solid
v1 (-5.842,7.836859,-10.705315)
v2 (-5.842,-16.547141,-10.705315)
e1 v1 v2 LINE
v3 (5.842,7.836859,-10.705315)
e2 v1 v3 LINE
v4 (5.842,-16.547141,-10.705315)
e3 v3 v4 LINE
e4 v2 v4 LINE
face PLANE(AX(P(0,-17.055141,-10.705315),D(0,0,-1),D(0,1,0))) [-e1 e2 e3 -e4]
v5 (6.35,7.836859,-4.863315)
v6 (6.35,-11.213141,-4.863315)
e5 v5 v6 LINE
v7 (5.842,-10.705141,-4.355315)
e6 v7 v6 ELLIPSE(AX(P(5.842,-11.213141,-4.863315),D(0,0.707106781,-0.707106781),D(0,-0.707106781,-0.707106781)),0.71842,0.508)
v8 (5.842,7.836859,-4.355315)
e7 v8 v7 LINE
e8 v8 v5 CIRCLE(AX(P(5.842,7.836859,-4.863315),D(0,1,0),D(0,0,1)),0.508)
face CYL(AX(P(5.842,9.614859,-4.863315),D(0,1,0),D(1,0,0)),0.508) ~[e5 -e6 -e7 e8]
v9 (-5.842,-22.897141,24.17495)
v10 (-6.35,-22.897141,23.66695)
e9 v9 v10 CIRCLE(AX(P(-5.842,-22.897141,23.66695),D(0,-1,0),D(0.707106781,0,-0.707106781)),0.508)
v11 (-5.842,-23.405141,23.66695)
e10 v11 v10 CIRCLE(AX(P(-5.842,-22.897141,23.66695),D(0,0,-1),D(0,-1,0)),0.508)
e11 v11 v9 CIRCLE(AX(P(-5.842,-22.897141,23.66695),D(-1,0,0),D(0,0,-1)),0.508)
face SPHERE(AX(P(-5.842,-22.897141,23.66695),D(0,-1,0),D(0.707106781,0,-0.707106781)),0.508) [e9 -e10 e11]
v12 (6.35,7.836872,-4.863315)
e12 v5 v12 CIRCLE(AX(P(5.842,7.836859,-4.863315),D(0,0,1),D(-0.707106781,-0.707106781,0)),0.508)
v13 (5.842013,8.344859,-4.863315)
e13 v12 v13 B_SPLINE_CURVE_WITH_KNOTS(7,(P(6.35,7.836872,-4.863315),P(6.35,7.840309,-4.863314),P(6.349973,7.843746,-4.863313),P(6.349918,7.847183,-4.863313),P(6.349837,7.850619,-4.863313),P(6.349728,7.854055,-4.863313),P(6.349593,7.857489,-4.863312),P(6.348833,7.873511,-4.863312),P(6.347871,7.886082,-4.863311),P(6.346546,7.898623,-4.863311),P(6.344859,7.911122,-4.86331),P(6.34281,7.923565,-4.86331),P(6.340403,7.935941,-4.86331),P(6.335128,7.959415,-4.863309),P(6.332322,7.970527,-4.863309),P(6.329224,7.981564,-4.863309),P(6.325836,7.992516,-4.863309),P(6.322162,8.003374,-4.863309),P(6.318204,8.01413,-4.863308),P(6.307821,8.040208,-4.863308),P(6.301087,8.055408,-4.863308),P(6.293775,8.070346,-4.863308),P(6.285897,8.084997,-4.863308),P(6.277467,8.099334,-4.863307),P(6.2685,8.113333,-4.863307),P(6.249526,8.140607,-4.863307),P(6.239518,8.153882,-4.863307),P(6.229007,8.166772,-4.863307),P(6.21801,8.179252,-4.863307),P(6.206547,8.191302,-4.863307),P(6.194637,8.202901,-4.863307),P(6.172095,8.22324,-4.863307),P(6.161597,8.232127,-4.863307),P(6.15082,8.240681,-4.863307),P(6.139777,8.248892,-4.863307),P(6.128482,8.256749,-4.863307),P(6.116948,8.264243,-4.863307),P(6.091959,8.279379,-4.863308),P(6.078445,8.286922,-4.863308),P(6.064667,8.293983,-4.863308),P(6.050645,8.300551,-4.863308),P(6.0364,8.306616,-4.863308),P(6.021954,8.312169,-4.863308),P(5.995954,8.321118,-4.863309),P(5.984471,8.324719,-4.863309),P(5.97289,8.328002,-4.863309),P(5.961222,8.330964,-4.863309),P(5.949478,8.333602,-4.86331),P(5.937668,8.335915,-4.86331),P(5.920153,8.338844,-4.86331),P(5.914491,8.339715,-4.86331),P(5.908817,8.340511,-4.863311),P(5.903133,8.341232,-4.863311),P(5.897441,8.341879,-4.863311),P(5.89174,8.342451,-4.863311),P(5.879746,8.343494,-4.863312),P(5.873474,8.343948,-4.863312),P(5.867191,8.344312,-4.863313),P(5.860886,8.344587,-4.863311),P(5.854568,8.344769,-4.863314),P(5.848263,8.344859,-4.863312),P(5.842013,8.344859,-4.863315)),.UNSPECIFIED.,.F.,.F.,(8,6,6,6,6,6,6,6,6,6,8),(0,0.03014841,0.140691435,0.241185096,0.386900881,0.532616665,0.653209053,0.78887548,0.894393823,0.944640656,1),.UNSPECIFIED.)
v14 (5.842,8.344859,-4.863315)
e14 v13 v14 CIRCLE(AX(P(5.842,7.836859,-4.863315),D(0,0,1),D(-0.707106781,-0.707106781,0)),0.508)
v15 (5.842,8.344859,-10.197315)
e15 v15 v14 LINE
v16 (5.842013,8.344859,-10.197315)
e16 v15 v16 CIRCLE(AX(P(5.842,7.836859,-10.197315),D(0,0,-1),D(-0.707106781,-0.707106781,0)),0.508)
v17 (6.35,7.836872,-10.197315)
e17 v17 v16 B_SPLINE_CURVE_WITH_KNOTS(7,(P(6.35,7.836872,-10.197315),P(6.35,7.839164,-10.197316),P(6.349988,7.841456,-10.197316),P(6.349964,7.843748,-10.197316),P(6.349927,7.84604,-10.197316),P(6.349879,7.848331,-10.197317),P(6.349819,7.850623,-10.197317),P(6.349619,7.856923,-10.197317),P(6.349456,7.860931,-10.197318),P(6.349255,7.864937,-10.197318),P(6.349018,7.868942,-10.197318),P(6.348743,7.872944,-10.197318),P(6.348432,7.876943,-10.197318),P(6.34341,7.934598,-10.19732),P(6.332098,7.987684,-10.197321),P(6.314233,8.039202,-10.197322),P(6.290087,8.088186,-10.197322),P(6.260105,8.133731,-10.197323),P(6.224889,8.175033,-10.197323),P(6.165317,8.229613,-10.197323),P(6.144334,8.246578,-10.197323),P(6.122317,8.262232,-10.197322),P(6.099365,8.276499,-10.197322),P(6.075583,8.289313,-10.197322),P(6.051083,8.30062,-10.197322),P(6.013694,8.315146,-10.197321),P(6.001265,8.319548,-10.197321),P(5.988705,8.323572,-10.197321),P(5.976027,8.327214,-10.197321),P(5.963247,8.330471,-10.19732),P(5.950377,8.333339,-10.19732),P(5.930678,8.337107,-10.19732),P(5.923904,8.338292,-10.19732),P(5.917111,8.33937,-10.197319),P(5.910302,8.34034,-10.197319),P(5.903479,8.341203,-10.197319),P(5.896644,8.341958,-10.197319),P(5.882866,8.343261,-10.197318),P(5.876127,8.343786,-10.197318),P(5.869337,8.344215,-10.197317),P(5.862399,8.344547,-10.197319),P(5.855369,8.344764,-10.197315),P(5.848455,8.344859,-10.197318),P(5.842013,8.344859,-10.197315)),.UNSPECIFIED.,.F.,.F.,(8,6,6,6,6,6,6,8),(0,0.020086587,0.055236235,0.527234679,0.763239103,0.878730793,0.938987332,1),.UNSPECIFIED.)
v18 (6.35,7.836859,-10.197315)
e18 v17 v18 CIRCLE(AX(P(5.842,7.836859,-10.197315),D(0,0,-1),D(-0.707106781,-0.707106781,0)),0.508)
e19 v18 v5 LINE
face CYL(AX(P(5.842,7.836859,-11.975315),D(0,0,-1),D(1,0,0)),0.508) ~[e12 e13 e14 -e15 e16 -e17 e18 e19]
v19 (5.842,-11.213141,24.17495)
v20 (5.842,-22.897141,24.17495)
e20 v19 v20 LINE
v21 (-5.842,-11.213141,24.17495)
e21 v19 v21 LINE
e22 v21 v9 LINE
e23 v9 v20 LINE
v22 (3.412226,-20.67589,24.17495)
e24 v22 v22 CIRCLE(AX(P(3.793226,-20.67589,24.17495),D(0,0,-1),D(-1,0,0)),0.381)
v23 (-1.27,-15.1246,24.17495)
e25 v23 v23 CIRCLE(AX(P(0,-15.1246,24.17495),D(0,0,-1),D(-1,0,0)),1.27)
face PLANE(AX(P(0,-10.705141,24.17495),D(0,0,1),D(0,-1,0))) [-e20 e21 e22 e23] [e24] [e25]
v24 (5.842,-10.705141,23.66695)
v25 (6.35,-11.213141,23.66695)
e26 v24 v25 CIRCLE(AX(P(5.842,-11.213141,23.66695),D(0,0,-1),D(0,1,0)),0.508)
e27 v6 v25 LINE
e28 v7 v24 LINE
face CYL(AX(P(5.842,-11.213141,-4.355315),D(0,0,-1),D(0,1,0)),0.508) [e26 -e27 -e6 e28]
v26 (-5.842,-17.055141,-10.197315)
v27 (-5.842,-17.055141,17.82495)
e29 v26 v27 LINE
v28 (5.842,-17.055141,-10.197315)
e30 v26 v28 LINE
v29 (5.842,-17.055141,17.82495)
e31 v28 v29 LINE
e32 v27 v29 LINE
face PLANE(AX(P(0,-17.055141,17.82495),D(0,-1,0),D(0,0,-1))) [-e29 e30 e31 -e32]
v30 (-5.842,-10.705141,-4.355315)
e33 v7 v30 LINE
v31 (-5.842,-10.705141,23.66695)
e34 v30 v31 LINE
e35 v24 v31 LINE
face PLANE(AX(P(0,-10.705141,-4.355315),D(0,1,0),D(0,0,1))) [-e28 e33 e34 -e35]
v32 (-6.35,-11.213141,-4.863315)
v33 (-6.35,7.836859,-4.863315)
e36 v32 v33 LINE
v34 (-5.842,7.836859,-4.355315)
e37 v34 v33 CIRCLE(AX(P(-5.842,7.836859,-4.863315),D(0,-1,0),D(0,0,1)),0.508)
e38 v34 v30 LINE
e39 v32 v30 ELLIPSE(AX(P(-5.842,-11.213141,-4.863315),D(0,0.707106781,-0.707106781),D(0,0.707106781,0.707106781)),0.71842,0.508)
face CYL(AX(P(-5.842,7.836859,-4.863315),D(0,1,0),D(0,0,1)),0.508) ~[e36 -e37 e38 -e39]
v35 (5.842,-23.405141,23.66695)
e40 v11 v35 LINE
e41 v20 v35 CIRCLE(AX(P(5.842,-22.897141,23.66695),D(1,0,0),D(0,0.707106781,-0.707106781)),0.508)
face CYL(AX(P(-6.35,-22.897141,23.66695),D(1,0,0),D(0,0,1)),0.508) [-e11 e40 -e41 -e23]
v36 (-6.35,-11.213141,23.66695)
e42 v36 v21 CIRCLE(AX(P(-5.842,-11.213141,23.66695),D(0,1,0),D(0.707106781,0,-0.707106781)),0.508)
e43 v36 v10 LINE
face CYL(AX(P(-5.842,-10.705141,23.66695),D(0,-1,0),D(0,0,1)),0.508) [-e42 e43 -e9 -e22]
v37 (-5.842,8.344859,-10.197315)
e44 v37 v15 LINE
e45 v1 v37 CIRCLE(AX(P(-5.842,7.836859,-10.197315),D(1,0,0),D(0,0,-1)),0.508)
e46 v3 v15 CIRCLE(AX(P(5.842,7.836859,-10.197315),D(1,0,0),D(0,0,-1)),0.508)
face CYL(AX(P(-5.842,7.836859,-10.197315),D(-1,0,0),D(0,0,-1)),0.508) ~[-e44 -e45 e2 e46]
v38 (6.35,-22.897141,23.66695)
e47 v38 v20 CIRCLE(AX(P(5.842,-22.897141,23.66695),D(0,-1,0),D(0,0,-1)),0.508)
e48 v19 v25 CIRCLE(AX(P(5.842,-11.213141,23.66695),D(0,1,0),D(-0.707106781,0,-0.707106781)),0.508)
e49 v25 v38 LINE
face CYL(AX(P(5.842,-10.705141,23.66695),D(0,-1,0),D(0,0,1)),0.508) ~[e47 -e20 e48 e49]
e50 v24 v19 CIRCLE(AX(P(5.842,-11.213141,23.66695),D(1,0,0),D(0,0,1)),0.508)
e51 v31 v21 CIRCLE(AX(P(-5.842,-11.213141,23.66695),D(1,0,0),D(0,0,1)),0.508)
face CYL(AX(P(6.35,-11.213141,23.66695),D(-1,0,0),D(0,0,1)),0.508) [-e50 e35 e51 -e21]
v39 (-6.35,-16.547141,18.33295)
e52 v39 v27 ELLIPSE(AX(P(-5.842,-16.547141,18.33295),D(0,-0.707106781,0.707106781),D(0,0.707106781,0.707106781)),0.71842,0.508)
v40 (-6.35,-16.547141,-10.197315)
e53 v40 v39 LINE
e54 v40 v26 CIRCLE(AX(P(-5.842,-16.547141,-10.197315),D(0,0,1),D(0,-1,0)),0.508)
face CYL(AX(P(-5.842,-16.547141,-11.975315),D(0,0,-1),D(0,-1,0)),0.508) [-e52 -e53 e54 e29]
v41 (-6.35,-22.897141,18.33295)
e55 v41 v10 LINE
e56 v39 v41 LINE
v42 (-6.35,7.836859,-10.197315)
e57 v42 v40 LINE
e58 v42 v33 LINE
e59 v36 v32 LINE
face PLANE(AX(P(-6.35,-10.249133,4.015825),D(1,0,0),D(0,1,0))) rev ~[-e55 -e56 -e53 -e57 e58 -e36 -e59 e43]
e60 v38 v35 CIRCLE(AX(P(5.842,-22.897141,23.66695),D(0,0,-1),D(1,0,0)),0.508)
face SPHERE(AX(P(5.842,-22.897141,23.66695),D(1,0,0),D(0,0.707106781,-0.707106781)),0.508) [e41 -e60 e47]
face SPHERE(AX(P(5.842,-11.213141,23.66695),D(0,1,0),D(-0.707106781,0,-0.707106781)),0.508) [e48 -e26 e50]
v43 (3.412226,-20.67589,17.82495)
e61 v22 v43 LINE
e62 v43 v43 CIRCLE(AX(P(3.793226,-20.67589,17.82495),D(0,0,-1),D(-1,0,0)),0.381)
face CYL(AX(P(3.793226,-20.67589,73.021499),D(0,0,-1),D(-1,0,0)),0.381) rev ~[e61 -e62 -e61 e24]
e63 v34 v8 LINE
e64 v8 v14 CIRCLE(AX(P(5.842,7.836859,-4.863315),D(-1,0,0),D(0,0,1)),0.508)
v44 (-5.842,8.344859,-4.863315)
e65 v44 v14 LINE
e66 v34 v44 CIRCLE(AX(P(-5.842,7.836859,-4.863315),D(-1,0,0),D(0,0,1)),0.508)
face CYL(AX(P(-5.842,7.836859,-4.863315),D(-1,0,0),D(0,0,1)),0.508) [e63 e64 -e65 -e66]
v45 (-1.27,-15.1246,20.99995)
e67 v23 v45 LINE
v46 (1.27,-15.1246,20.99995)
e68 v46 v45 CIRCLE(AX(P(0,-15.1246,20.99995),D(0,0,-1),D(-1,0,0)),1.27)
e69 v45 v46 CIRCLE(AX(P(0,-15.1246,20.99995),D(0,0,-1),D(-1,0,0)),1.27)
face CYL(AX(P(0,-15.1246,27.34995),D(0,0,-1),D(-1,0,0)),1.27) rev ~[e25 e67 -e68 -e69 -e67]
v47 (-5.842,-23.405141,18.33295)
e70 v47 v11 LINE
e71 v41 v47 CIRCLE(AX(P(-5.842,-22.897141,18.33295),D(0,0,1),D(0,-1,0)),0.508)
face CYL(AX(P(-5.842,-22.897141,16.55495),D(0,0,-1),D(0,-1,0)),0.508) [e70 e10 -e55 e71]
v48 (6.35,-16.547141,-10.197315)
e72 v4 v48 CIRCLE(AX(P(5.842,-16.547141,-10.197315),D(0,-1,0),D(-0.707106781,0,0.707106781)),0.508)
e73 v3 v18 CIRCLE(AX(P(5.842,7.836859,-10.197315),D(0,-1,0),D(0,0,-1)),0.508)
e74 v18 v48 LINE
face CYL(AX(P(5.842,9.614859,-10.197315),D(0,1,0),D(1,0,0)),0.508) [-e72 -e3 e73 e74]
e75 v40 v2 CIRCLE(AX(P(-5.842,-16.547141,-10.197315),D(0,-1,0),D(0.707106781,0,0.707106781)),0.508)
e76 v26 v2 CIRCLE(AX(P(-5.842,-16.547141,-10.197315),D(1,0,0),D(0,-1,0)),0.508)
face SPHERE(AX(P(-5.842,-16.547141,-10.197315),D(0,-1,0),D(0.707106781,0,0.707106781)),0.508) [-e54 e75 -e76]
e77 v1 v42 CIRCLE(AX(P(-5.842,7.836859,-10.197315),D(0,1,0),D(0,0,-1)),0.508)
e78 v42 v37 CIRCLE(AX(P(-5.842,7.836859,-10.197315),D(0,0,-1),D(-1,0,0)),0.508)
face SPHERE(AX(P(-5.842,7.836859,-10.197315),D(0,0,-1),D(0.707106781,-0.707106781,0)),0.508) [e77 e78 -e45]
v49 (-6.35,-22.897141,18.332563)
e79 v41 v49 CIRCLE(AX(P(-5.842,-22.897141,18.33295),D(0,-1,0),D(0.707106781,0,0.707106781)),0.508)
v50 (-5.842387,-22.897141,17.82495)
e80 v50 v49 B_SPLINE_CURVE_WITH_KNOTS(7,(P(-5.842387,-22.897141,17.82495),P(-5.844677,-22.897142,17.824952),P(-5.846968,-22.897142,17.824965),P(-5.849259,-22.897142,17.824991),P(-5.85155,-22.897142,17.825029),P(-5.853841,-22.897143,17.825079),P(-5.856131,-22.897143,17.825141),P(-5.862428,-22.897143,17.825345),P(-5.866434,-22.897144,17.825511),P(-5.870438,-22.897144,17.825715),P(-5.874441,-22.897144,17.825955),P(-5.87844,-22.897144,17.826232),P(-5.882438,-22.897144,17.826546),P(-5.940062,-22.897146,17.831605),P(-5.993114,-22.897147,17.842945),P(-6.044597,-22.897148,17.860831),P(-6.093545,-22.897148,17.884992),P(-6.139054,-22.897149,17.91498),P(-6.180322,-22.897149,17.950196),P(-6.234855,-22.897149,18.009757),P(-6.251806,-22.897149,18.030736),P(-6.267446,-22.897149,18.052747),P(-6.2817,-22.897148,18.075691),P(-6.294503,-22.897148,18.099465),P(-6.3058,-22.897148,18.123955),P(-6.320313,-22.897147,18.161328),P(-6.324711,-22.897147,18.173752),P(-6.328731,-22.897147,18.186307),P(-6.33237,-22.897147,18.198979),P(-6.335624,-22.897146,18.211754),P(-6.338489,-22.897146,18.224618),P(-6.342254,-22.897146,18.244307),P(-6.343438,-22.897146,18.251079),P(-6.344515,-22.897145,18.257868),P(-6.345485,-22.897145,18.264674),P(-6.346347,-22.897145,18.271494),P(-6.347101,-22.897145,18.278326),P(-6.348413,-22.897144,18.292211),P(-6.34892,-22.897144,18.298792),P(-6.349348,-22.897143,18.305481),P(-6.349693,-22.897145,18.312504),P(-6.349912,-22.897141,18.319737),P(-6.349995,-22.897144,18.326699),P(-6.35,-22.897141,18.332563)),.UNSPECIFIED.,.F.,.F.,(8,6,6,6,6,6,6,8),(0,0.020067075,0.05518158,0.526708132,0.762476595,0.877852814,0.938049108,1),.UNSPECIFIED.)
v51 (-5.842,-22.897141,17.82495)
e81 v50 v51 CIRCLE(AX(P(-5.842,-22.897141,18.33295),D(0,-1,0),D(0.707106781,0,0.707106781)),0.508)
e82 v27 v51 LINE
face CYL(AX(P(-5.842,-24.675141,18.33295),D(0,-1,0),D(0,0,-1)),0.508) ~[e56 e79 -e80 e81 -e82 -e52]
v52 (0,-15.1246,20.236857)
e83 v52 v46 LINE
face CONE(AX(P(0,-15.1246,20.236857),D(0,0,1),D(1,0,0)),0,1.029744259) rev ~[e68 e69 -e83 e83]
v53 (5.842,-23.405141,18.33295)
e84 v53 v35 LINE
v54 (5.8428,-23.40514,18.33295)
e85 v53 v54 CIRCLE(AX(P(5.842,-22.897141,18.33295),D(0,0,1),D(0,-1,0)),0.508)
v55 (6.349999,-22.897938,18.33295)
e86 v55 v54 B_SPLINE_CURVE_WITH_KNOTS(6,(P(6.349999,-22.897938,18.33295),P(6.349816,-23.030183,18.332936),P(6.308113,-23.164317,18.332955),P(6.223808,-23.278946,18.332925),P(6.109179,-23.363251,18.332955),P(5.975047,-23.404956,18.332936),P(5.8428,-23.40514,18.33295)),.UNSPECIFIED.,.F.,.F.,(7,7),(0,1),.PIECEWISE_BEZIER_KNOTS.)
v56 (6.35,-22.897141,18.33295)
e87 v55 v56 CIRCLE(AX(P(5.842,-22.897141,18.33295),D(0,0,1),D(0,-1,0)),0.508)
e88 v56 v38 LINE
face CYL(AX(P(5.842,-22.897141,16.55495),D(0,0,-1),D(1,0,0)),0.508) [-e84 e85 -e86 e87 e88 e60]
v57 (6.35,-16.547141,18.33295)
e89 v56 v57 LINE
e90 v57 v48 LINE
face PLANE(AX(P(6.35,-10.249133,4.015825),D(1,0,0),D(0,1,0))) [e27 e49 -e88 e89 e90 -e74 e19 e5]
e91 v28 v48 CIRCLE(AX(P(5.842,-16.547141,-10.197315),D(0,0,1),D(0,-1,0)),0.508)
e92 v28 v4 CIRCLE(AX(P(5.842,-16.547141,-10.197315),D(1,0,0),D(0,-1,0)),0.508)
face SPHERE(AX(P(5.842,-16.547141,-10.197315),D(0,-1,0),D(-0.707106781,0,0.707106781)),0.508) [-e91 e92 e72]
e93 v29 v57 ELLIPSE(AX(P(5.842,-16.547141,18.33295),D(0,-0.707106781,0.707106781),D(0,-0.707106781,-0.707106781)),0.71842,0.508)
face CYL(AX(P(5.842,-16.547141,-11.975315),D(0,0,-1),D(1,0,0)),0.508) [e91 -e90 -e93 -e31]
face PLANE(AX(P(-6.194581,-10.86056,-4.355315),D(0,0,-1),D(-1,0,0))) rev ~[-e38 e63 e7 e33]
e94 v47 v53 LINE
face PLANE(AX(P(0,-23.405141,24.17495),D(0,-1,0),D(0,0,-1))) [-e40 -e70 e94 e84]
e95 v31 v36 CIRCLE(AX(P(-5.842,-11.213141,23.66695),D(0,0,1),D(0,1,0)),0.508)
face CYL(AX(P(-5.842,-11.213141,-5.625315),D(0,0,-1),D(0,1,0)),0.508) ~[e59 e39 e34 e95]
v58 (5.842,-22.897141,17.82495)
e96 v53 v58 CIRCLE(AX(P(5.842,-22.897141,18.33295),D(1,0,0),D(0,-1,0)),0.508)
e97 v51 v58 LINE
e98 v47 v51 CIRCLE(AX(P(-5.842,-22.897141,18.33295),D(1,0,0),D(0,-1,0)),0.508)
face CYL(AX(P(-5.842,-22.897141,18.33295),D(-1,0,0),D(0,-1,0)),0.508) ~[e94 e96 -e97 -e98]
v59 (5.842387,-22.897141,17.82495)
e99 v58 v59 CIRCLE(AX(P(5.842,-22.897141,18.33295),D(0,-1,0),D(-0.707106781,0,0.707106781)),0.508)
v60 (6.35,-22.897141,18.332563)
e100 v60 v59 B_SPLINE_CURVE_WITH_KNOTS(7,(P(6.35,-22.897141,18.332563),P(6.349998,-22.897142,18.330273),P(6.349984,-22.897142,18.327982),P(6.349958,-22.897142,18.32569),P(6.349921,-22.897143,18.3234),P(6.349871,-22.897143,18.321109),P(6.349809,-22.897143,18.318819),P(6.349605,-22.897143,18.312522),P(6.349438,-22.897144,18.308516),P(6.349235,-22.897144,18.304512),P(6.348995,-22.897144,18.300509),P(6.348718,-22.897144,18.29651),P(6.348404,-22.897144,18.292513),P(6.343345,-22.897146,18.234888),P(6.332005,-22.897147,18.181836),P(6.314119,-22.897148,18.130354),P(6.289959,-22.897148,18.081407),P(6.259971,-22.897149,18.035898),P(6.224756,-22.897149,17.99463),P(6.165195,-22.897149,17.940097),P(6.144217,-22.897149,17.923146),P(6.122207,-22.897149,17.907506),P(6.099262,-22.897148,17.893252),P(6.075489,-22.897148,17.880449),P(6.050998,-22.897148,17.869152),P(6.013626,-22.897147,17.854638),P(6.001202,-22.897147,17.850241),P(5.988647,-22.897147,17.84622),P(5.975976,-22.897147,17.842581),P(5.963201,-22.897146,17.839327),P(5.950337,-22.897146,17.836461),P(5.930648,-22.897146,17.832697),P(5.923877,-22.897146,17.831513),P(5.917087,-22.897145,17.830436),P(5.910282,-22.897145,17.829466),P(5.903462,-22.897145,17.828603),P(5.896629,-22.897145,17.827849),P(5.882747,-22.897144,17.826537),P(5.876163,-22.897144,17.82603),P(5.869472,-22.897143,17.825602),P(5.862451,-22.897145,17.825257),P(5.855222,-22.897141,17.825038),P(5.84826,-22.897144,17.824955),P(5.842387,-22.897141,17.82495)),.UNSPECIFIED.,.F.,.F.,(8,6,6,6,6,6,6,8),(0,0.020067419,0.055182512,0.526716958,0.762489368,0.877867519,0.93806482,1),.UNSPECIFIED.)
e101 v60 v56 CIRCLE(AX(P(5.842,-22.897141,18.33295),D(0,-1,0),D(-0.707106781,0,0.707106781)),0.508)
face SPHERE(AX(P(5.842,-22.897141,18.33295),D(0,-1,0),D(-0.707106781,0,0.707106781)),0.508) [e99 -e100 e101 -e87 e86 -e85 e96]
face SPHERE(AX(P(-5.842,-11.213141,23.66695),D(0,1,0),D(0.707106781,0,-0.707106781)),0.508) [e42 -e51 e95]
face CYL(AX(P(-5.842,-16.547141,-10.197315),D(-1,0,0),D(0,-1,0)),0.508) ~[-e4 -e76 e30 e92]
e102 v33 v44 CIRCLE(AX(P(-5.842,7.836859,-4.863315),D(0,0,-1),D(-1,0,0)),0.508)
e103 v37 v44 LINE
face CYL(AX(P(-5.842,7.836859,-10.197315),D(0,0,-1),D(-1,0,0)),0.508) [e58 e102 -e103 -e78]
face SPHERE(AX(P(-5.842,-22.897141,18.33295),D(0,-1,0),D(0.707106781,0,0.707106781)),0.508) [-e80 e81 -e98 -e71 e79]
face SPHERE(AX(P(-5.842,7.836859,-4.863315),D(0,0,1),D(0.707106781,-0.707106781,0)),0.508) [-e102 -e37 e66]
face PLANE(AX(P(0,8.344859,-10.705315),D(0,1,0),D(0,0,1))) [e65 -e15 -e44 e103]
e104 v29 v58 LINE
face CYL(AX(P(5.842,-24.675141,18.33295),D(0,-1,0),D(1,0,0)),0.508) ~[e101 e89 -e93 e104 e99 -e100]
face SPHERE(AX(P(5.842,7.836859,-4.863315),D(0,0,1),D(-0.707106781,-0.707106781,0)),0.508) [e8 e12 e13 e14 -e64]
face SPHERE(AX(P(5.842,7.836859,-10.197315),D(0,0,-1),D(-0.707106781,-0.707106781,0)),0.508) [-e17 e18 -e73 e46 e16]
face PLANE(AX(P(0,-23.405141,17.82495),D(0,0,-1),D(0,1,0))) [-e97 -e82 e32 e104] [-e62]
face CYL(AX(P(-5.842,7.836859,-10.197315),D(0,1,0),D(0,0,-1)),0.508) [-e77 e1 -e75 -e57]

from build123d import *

# Parameters (mm, degrees)
F1_DEPTH      = 6.35
F1_DEPTH_BACK = 6.35
F2_R          = 0.508
F3_T1_DEPTH   = 7.112
F3_T3_DEPTH   = 7.62
F3_T5_DEPTH   = 28.0222646616
F3_T7_DEPTH   = 29.8002646616
F3_T9_DEPTH   = 27.94
F3_T11_DEPTH  = 20.32
F3_T13_DEPTH  = 8.89
F3_S17_W      = 0.508
F3_S17_H      = 0.508
F3_T18_DEPTH  = 0.508
F3_S23_W      = 0.508
F3_S23_H      = 0.508
F3_T24_DEPTH  = 0.508
F3_T31_DEPTH  = 8.89
F3_T35_DEPTH  = 31.0702646616
F3_T42_DEPTH  = 29.2922646616
F3_T46_DEPTH  = 21.59
F4_T1_DEPTH   = 28.0222646616
F4_T3_DEPTH   = 11.684
F4_T5_DEPTH   = 5.334
F4_T7_DEPTH   = 26.162
F4_T9_DEPTH   = 29.8002646616
F4_T11_DEPTH  = 18.542
F4_T13_DEPTH  = 7.62
F4_T15_DEPTH  = 7.112
F4_S19_W      = 0.508
F4_S19_H      = 0.508
F4_T20_DEPTH  = 0.508
F4_S25_W      = 0.508
F4_S25_H      = 0.508
F4_T26_DEPTH  = 0.508
F4_S31_W      = 0.508
F4_S31_H      = 0.508
F4_T32_DEPTH  = 0.508
F4_S37_W      = 0.508
F4_S37_H      = 0.508
F4_T38_DEPTH  = 0.508
F4_S43_W      = 0.508
F4_S43_H      = 0.508
F4_T44_DEPTH  = 0.508
F4_S49_W      = 0.508
F4_S49_H      = 0.508
F4_T50_DEPTH  = 0.508
F4_T57_DEPTH  = 19.812
F4_T61_DEPTH  = 29.2922646616
F4_T68_DEPTH  = 31.0702646616
F4_T72_DEPTH  = 8.89
F5_T1_DEPTH   = 11.684
F5_S5_W       = 0.508
F5_S5_H       = 0.508
F5_T6_DEPTH   = 0.508
F5_S11_W      = 0.508
F5_S11_H      = 0.508
F5_T12_DEPTH  = 0.508
F6_T1_DEPTH   = 11.684
F6_S5_W       = 0.508
F6_S5_H       = 0.508
F6_T6_DEPTH   = 0.508
F6_S11_W      = 0.508
F6_S11_H      = 0.508
F6_T12_DEPTH  = 0.508
F8_D          = 2.54
F8_DEPTH      = 3.175
F8_TIP        = 0.7630929862
F10_D         = 0.762


# Not quite as in the source:
# - a fillet or chamfer that OpenCascade refuses, or shapes differently, is made with other operations: its cross-section is extruded or revolved along the edge and cut away or added


with BuildPart() as f1:
    # F0 (on Right) → F1 (new body, two sides)
    with BuildSketch(Plane.YZ) as f1_sk:
        Polygon((-10.7051408962, 24.1749497761), (-23.4051408962, 24.1749497761), (-23.4051408962, 17.8249497761), (-17.0551408962, 17.8249497761), (-17.0551408962, -10.7053148855), (8.3448591038, -10.7053148855), (8.3448591038, -4.3553148855), (-10.7051408962, -4.3553148855), align=None)
    extrude(amount=F1_DEPTH)
    extrude(f1_sk.sketch, amount=-F1_DEPTH_BACK)

    # F2
    f2_edges = [f1.edges().sort_by_distance(p)[0] for p in [
        (0, -23.405141, 24.17495),
        (6.35, -17.055141, 24.17495),
        (0, -10.705141, 24.17495),
        (-6.35, -17.055141, 24.17495),
    ]]
    fillet(f2_edges, radius=F2_R)

    # F3: fillet of radius 0.508 on 7 edges, made by hand

    # F3_s2 → F3_t1 (cut)
    with BuildSketch(Plane.XY.offset(16.5549497761)):
        with BuildLine():
            ThreePointArc((6.35, -22.8971408962), (6.2012102448, -23.256351141), (5.842, -23.4051408962))
            Line((5.842, -23.4051408962), (6.35, -23.4051408962))
            Line((6.35, -23.4051408962), (6.35, -22.8971408962))
        make_face()
    extrude(amount=F3_T1_DEPTH, mode=Mode.SUBTRACT)

    # F3_s4 → F3_t3 (cut)
    with BuildSketch(Plane.XZ.offset(17.0551408962)):
        with BuildLine():
            ThreePointArc((6.35, 18.3329497761), (6.2012102448, 17.9737395313), (5.842, 17.8249497761))
            Line((5.842, 17.8249497761), (6.35, 17.8249497761))
            Line((6.35, 17.8249497761), (6.35, 18.3329497761))
        make_face()
    extrude(amount=F3_T3_DEPTH, mode=Mode.SUBTRACT)

    # F3_s6 → F3_t5 (cut)
    with BuildSketch(Plane.XY.offset(-4.3553148855)):
        with BuildLine():
            ThreePointArc((5.842, -10.7051408962), (6.2012102448, -10.8539306514), (6.35, -11.2131408962))
            Line((6.35, -11.2131408962), (6.35, -10.7051408962))
            Line((6.35, -10.7051408962), (5.842, -10.7051408962))
        make_face()
    extrude(amount=F3_T5_DEPTH, mode=Mode.SUBTRACT)

    # F3_s8 → F3_t7 (cut)
    with BuildSketch(Plane.XY.offset(-11.9753148855)):
        with BuildLine():
            ThreePointArc((6.35, -16.5471408962), (6.2012102448, -16.906351141), (5.842, -17.0551408962))
            Line((5.842, -17.0551408962), (6.35, -17.0551408962))
            Line((6.35, -17.0551408962), (6.35, -16.5471408962))
        make_face()
    extrude(amount=F3_T7_DEPTH, mode=Mode.SUBTRACT)

    # F3_s10 → F3_t9 (cut)
    with BuildSketch(Plane.XZ.offset(-9.6148591038)):
        with BuildLine():
            ThreePointArc((6.35, -10.1973148855), (6.2012102448, -10.5565251304), (5.842, -10.7053148855))
            Line((5.842, -10.7053148855), (6.35, -10.7053148855))
            Line((6.35, -10.7053148855), (6.35, -10.1973148855))
        make_face()
    extrude(amount=F3_T9_DEPTH, mode=Mode.SUBTRACT)

    # F3_s12 → F3_t11 (cut)
    with BuildSketch(Plane.XZ.offset(-9.6148591038)):
        with BuildLine():
            ThreePointArc((6.35, -4.8633148855), (6.2012102448, -4.5041046407), (5.842, -4.3553148855))
            Line((5.842, -4.3553148855), (6.35, -4.3553148855))
            Line((6.35, -4.3553148855), (6.35, -4.8633148855))
        make_face()
    extrude(amount=F3_T11_DEPTH, mode=Mode.SUBTRACT)

    # F3_s14 → F3_t13 (cut)
    with BuildSketch(Plane.XY.offset(-11.9753148855)):
        with BuildLine():
            ThreePointArc((6.35, 7.8368591038), (6.2012102448, 8.1960693486), (5.842, 8.3448591038))
            Line((5.842, 8.3448591038), (6.35, 8.3448591038))
            Line((6.35, 8.3448591038), (6.35, 7.8368591038))
        make_face()
    extrude(amount=F3_T13_DEPTH, mode=Mode.SUBTRACT)


with BuildPart() as f3_tool16:
    # F3_s17 → F3_t18 (new body)
    with BuildSketch(Plane.XZ.offset(11.2131408962)):
        with Locations((6.096, 23.9209497761)):
            Rectangle(F3_S17_W, F3_S17_H)
    extrude(amount=-F3_T18_DEPTH)

    # F3_s19 → F3_t20 (revolve, cut)
    with BuildSketch(Plane(origin=(5.842, -11.2131408962, 23.6669497761), x_dir=(-0.7071067812, 0, -0.7071067812), z_dir=(0.7071067812, 0, -0.7071067812))):
        with BuildLine():
            ThreePointArc((0, -0.508), (0.508, 0), (0, 0.508))
            Line((0, 0.508), (0, -0.508))
        make_face()
    revolve(axis=Axis((5.842, -11.2131408962, 23.6669497761), (0, 1, 0)), mode=Mode.SUBTRACT)


with BuildPart() as f1_1:
    add(f1.part)

    # F3_t15: cut F3_tool16
    add(f3_tool16.part, mode=Mode.SUBTRACT)


with BuildPart() as f3_tool22:
    # F3_s23 → F3_t24 (new body)
    with BuildSketch(Plane.YZ.offset(5.842)):
        with Locations((-23.1511408962, 23.9209497761)):
            Rectangle(F3_S23_W, F3_S23_H)
    extrude(amount=F3_T24_DEPTH)

    # F3_s25 → F3_t26 (revolve, cut)
    with BuildSketch(Plane(origin=(5.842, -22.8971408962, 23.6669497761), x_dir=(0, 0.7071067812, -0.7071067812), z_dir=(0, -0.7071067812, -0.7071067812))):
        with BuildLine():
            ThreePointArc((0, -0.508), (0.508, 0), (0, 0.508))
            Line((0, 0.508), (0, -0.508))
        make_face()
    revolve(axis=Axis((5.842, -22.8971408962, 23.6669497761), (1, 0, 0)), mode=Mode.SUBTRACT)


with BuildPart() as f1_2:
    add(f1_1.part)

    # F3_t21: cut F3_tool22
    add(f3_tool22.part, mode=Mode.SUBTRACT)


with BuildPart() as f3_tool29:
    # F3_s30 → F3_t31 (new body)
    with BuildSketch(Plane.XZ.offset(24.6751408962)):
        with BuildLine():
            ThreePointArc((6.35, 18.3329497761), (6.2012102448, 17.9737395313), (5.842, 17.8249497761))
            Line((5.842, 17.8249497761), (6.35, 17.8249497761))
            Line((6.35, 17.8249497761), (6.35, 18.3329497761))
        make_face()
    extrude(amount=-F3_T31_DEPTH)

    split(bisect_by=Plane.XZ.offset(17.0551408962), keep=Keep.BOTTOM)


with BuildPart() as f3_tool33:
    # F3_s34 → F3_t35 (new body)
    with BuildSketch(Plane.XY.offset(19.0949497761)):
        with BuildLine():
            ThreePointArc((6.35, -16.5471408962), (6.2012102448, -16.906351141), (5.842, -17.0551408962))
            Line((5.842, -17.0551408962), (6.35, -17.0551408962))
            Line((6.35, -17.0551408962), (6.35, -16.5471408962))
        make_face()
    extrude(amount=-F3_T35_DEPTH)

    split(bisect_by=Plane.XY.offset(17.8249497761), keep=Keep.TOP)


with BuildPart() as f3_tool29_1:
    add(f3_tool29.part)

    # F3_t37: intersect F3_tool33
    add(f3_tool33.part, mode=Mode.INTERSECT)


with BuildPart() as f1_3:
    add(f1_2.part)

    # F3_t27: cut F3_tool29
    add(f3_tool29_1.part, mode=Mode.SUBTRACT)


with BuildPart() as f3_tool40:
    # F3_s41 → F3_t42 (new body)
    with BuildSketch(Plane.XY.offset(-5.6253148855)):
        with BuildLine():
            ThreePointArc((5.842, -10.7051408962), (6.2012102448, -10.8539306514), (6.35, -11.2131408962))
            Line((6.35, -11.2131408962), (6.35, -10.7051408962))
            Line((6.35, -10.7051408962), (5.842, -10.7051408962))
        make_face()
    extrude(amount=F3_T42_DEPTH)

    split(bisect_by=Plane.XY.offset(-4.3553148855), keep=Keep.BOTTOM)


with BuildPart() as f3_tool44:
    # F3_s45 → F3_t46 (new body)
    with BuildSketch(Plane.XZ.offset(-9.6148591038)):
        with BuildLine():
            ThreePointArc((6.35, -4.8633148855), (6.2012102448, -4.5041046407), (5.842, -4.3553148855))
            Line((5.842, -4.3553148855), (6.35, -4.3553148855))
            Line((6.35, -4.3553148855), (6.35, -4.8633148855))
        make_face()
    extrude(amount=F3_T46_DEPTH)

    split(bisect_by=Plane.XZ.offset(10.7051408962), keep=Keep.TOP)


with BuildPart() as f3_tool40_1:
    add(f3_tool40.part)

    # F3_t48: intersect F3_tool44
    add(f3_tool44.part, mode=Mode.INTERSECT)


with BuildPart() as f1_4:
    add(f1_3.part)

    # F3_t38: cut F3_tool40
    add(f3_tool40_1.part, mode=Mode.SUBTRACT)

    # F4: fillet of radius 0.508 on 9 edges, made by hand

    # F4_s2 → F4_t1 (cut)
    with BuildSketch(Plane.XY.offset(-4.3553148855)):
        with BuildLine():
            ThreePointArc((-5.842, -10.7051408962), (-6.2012102448, -10.8539306514), (-6.35, -11.2131408962))
            Line((-6.35, -11.2131408962), (-6.35, -10.7051408962))
            Line((-6.35, -10.7051408962), (-5.842, -10.7051408962))
        make_face()
    extrude(amount=F4_T1_DEPTH, mode=Mode.SUBTRACT)

    # F4_s4 → F4_t3 (cut)
    with BuildSketch(Plane.YZ.offset(-5.842)):
        with BuildLine():
            ThreePointArc((7.8368591038, -4.3553148855), (8.1960693486, -4.5041046407), (8.3448591038, -4.8633148855))
            Line((8.3448591038, -4.8633148855), (8.3448591038, -4.3553148855))
            Line((8.3448591038, -4.3553148855), (7.8368591038, -4.3553148855))
        make_face()
        with BuildLine():
            ThreePointArc((7.8368591038, -10.7053148855), (8.1960693486, -10.5565251304), (8.3448591038, -10.1973148855))
            Line((8.3448591038, -10.1973148855), (8.3448591038, -10.7053148855))
            Line((8.3448591038, -10.7053148855), (7.8368591038, -10.7053148855))
        make_face()
    extrude(amount=F4_T3_DEPTH, mode=Mode.SUBTRACT)

    # F4_s6 → F4_t5 (cut)
    with BuildSketch(Plane.XY.offset(-10.1973148855)):
        with BuildLine():
            ThreePointArc((-6.35, 7.8368591038), (-6.2012102448, 8.1960693486), (-5.842, 8.3448591038))
            Line((-5.842, 8.3448591038), (-6.35, 8.3448591038))
            Line((-6.35, 8.3448591038), (-6.35, 7.8368591038))
        make_face()
    extrude(amount=F4_T5_DEPTH, mode=Mode.SUBTRACT)

    # F4_s8 → F4_t7 (cut)
    with BuildSketch(Plane.XZ.offset(-7.8368591038)):
        with BuildLine():
            ThreePointArc((-5.842, -10.7053148855), (-6.2012102448, -10.5565251304), (-6.35, -10.1973148855))
            Line((-6.35, -10.1973148855), (-6.35, -10.7053148855))
            Line((-6.35, -10.7053148855), (-5.842, -10.7053148855))
        make_face()
    extrude(amount=F4_T7_DEPTH, mode=Mode.SUBTRACT)

    # F4_s10 → F4_t9 (cut)
    with BuildSketch(Plane.XY.offset(-11.9753148855)):
        with BuildLine():
            ThreePointArc((-5.842, -17.0551408962), (-6.2012102448, -16.906351141), (-6.35, -16.5471408962))
            Line((-6.35, -16.5471408962), (-6.35, -17.0551408962))
            Line((-6.35, -17.0551408962), (-5.842, -17.0551408962))
        make_face()
    extrude(amount=F4_T9_DEPTH, mode=Mode.SUBTRACT)

    # F4_s12 → F4_t11 (cut)
    with BuildSketch(Plane.XZ.offset(-7.8368591038)):
        with BuildLine():
            ThreePointArc((-5.842, -4.3553148855), (-6.2012102448, -4.5041046407), (-6.35, -4.8633148855))
            Line((-6.35, -4.8633148855), (-6.35, -4.3553148855))
            Line((-6.35, -4.3553148855), (-5.842, -4.3553148855))
        make_face()
    extrude(amount=F4_T11_DEPTH, mode=Mode.SUBTRACT)

    # F4_s14 → F4_t13 (cut)
    with BuildSketch(Plane.XZ.offset(17.0551408962)):
        with BuildLine():
            ThreePointArc((-5.842, 17.8249497761), (-6.2012102448, 17.9737395313), (-6.35, 18.3329497761))
            Line((-6.35, 18.3329497761), (-6.35, 17.8249497761))
            Line((-6.35, 17.8249497761), (-5.842, 17.8249497761))
        make_face()
    extrude(amount=F4_T13_DEPTH, mode=Mode.SUBTRACT)

    # F4_s16 → F4_t15 (cut)
    with BuildSketch(Plane.XY.offset(16.5549497761)):
        with BuildLine():
            ThreePointArc((-5.842, -23.4051408962), (-6.2012102448, -23.256351141), (-6.35, -22.8971408962))
            Line((-6.35, -22.8971408962), (-6.35, -23.4051408962))
            Line((-6.35, -23.4051408962), (-5.842, -23.4051408962))
        make_face()
    extrude(amount=F4_T15_DEPTH, mode=Mode.SUBTRACT)


with BuildPart() as f4_tool18:
    # F4_s19 → F4_t20 (new body)
    with BuildSketch(Plane.XZ.offset(22.8971408962)):
        with Locations((-6.096, 23.9209497761)):
            Rectangle(F4_S19_W, F4_S19_H)
    extrude(amount=F4_T20_DEPTH)

    # F4_s21 → F4_t22 (revolve, cut)
    with BuildSketch(Plane(origin=(-5.842, -22.8971408962, 23.6669497761), x_dir=(0.7071067812, 0, -0.7071067812), z_dir=(-0.7071067812, 0, -0.7071067812))):
        with BuildLine():
            ThreePointArc((0, -0.508), (0.508, 0), (0, 0.508))
            Line((0, 0.508), (0, -0.508))
        make_face()
    revolve(axis=Axis((-5.842, -22.8971408962, 23.6669497761), (0, -1, 0)), mode=Mode.SUBTRACT)


with BuildPart() as f1_5:
    add(f1_4.part)

    # F4_t17: cut F4_tool18
    add(f4_tool18.part, mode=Mode.SUBTRACT)


with BuildPart() as f4_tool24:
    # F4_s25 → F4_t26 (new body)
    with BuildSketch(Plane.XY.offset(-10.1973148855)):
        with Locations((6.096, 8.0908591038)):
            Rectangle(F4_S25_W, F4_S25_H)
    extrude(amount=-F4_T26_DEPTH)

    # F4_s27 → F4_t28 (revolve, cut)
    with BuildSketch(Plane(origin=(5.842, 7.8368591038, -10.1973148855), x_dir=(-0.7071067812, -0.7071067812, 0), z_dir=(0.7071067812, -0.7071067812, 0))):
        with BuildLine():
            ThreePointArc((0, -0.508), (0.508, 0), (0, 0.508))
            Line((0, 0.508), (0, -0.508))
        make_face()
    revolve(axis=Axis((5.842, 7.8368591038, -10.1973148855), (0, 0, -1)), mode=Mode.SUBTRACT)


with BuildPart() as f1_6:
    add(f1_5.part)

    # F4_t23: cut F4_tool24
    add(f4_tool24.part, mode=Mode.SUBTRACT)


with BuildPart() as f4_tool30:
    # F4_s31 → F4_t32 (new body)
    with BuildSketch(Plane.XY.offset(-4.8633148855)):
        with Locations((6.096, 8.0908591038)):
            Rectangle(F4_S31_W, F4_S31_H)
    extrude(amount=F4_T32_DEPTH)

    # F4_s33 → F4_t34 (revolve, cut)
    with BuildSketch(Plane(origin=(5.842, 7.8368591038, -4.8633148855), x_dir=(-0.7071067812, -0.7071067812, 0), z_dir=(-0.7071067812, 0.7071067812, 0))):
        with BuildLine():
            ThreePointArc((0, -0.508), (0.508, 0), (0, 0.508))
            Line((0, 0.508), (0, -0.508))
        make_face()
    revolve(axis=Axis((5.842, 7.8368591038, -4.8633148855), (0, 0, 1)), mode=Mode.SUBTRACT)


with BuildPart() as f1_7:
    add(f1_6.part)

    # F4_t29: cut F4_tool30
    add(f4_tool30.part, mode=Mode.SUBTRACT)


with BuildPart() as f4_tool36:
    # F4_s37 → F4_t38 (new body)
    with BuildSketch(Plane.XZ.offset(11.2131408962)):
        with Locations((-6.096, 23.9209497761)):
            Rectangle(F4_S37_W, F4_S37_H)
    extrude(amount=-F4_T38_DEPTH)

    # F4_s39 → F4_t40 (revolve, cut)
    with BuildSketch(Plane(origin=(-5.842, -11.2131408962, 23.6669497761), x_dir=(0.7071067812, 0, -0.7071067812), z_dir=(0.7071067812, 0, 0.7071067812))):
        with BuildLine():
            ThreePointArc((0, -0.508), (0.508, 0), (0, 0.508))
            Line((0, 0.508), (0, -0.508))
        make_face()
    revolve(axis=Axis((-5.842, -11.2131408962, 23.6669497761), (0, 1, 0)), mode=Mode.SUBTRACT)


with BuildPart() as f1_8:
    add(f1_7.part)

    # F4_t35: cut F4_tool36
    add(f4_tool36.part, mode=Mode.SUBTRACT)


with BuildPart() as f4_tool42:
    # F4_s43 → F4_t44 (new body)
    with BuildSketch(Plane.XY.offset(-4.8633148855)):
        with Locations((-6.096, 8.0908591038)):
            Rectangle(F4_S43_W, F4_S43_H)
    extrude(amount=F4_T44_DEPTH)

    # F4_s45 → F4_t46 (revolve, cut)
    with BuildSketch(Plane(origin=(-5.842, 7.8368591038, -4.8633148855), x_dir=(0.7071067812, -0.7071067812, 0), z_dir=(-0.7071067812, -0.7071067812, 0))):
        with BuildLine():
            ThreePointArc((0, -0.508), (0.508, 0), (0, 0.508))
            Line((0, 0.508), (0, -0.508))
        make_face()
    revolve(axis=Axis((-5.842, 7.8368591038, -4.8633148855), (0, 0, 1)), mode=Mode.SUBTRACT)


with BuildPart() as f1_9:
    add(f1_8.part)

    # F4_t41: cut F4_tool42
    add(f4_tool42.part, mode=Mode.SUBTRACT)


with BuildPart() as f4_tool48:
    # F4_s49 → F4_t50 (new body)
    with BuildSketch(Plane.XY.offset(-10.1973148855)):
        with Locations((-6.096, 8.0908591038)):
            Rectangle(F4_S49_W, F4_S49_H)
    extrude(amount=-F4_T50_DEPTH)

    # F4_s51 → F4_t52 (revolve, cut)
    with BuildSketch(Plane(origin=(-5.842, 7.8368591038, -10.1973148855), x_dir=(0.7071067812, -0.7071067812, 0), z_dir=(0.7071067812, 0.7071067812, 0))):
        with BuildLine():
            ThreePointArc((0, -0.508), (0.508, 0), (0, 0.508))
            Line((0, 0.508), (0, -0.508))
        make_face()
    revolve(axis=Axis((-5.842, 7.8368591038, -10.1973148855), (0, 0, -1)), mode=Mode.SUBTRACT)


with BuildPart() as f1_10:
    add(f1_9.part)

    # F4_t47: cut F4_tool48
    add(f4_tool48.part, mode=Mode.SUBTRACT)


with BuildPart() as f4_tool55:
    # F4_s56 → F4_t57 (new body)
    with BuildSketch(Plane.XZ.offset(-7.8368591038)):
        with BuildLine():
            ThreePointArc((-5.842, -4.3553148855), (-6.2012102448, -4.5041046407), (-6.35, -4.8633148855))
            Line((-6.35, -4.8633148855), (-6.35, -4.3553148855))
            Line((-6.35, -4.3553148855), (-5.842, -4.3553148855))
        make_face()
    extrude(amount=F4_T57_DEPTH)

    split(bisect_by=Plane.XZ.offset(10.7051408962), keep=Keep.TOP)


with BuildPart() as f4_tool59:
    # F4_s60 → F4_t61 (new body)
    with BuildSketch(Plane.XY.offset(-5.6253148855)):
        with BuildLine():
            ThreePointArc((-5.842, -10.7051408962), (-6.2012102448, -10.8539306514), (-6.35, -11.2131408962))
            Line((-6.35, -11.2131408962), (-6.35, -10.7051408962))
            Line((-6.35, -10.7051408962), (-5.842, -10.7051408962))
        make_face()
    extrude(amount=F4_T61_DEPTH)

    split(bisect_by=Plane.XY.offset(-4.3553148855), keep=Keep.BOTTOM)


with BuildPart() as f4_tool55_1:
    add(f4_tool55.part)

    # F4_t63: intersect F4_tool59
    add(f4_tool59.part, mode=Mode.INTERSECT)


with BuildPart() as f1_11:
    add(f1_10.part)

    # F4_t53: cut F4_tool55
    add(f4_tool55_1.part, mode=Mode.SUBTRACT)


with BuildPart() as f4_tool66:
    # F4_s67 → F4_t68 (new body)
    with BuildSketch(Plane.XY.offset(19.0949497761)):
        with BuildLine():
            ThreePointArc((-5.842, -17.0551408962), (-6.2012102448, -16.906351141), (-6.35, -16.5471408962))
            Line((-6.35, -16.5471408962), (-6.35, -17.0551408962))
            Line((-6.35, -17.0551408962), (-5.842, -17.0551408962))
        make_face()
    extrude(amount=-F4_T68_DEPTH)

    split(bisect_by=Plane.XY.offset(17.8249497761), keep=Keep.TOP)


with BuildPart() as f4_tool70:
    # F4_s71 → F4_t72 (new body)
    with BuildSketch(Plane.XZ.offset(24.6751408962)):
        with BuildLine():
            ThreePointArc((-5.842, 17.8249497761), (-6.2012102448, 17.9737395313), (-6.35, 18.3329497761))
            Line((-6.35, 18.3329497761), (-6.35, 17.8249497761))
            Line((-6.35, 17.8249497761), (-5.842, 17.8249497761))
        make_face()
    extrude(amount=-F4_T72_DEPTH)

    split(bisect_by=Plane.XZ.offset(17.0551408962), keep=Keep.BOTTOM)


with BuildPart() as f4_tool66_1:
    add(f4_tool66.part)

    # F4_t74: intersect F4_tool70
    add(f4_tool70.part, mode=Mode.INTERSECT)


with BuildPart() as f1_12:
    add(f1_11.part)

    # F4_t64: cut F4_tool66
    add(f4_tool66_1.part, mode=Mode.SUBTRACT)

    # F5: fillet of radius 0.508 on 1 edges, made by hand

    # F5_s2 → F5_t1 (cut)
    with BuildSketch(Plane.YZ.offset(-5.842)):
        with BuildLine():
            ThreePointArc((-17.0551408962, -10.1973148855), (-16.906351141, -10.5565251304), (-16.5471408962, -10.7053148855))
            Line((-16.5471408962, -10.7053148855), (-17.0551408962, -10.7053148855))
            Line((-17.0551408962, -10.7053148855), (-17.0551408962, -10.1973148855))
        make_face()
    extrude(amount=F5_T1_DEPTH, mode=Mode.SUBTRACT)


with BuildPart() as f5_tool4:
    # F5_s5 → F5_t6 (new body)
    with BuildSketch(Plane.XZ.offset(16.5471408962)):
        with Locations((-6.096, -10.4513148855)):
            Rectangle(F5_S5_W, F5_S5_H)
    extrude(amount=F5_T6_DEPTH)

    # F5_s7 → F5_t8 (revolve, cut)
    with BuildSketch(Plane(origin=(-5.842, -16.5471408962, -10.1973148855), x_dir=(0.7071067812, 0, 0.7071067812), z_dir=(0.7071067812, 0, -0.7071067812))):
        with BuildLine():
            ThreePointArc((0, -0.508), (0.508, 0), (0, 0.508))
            Line((0, 0.508), (0, -0.508))
        make_face()
    revolve(axis=Axis((-5.842, -16.5471408962, -10.1973148855), (0, -1, 0)), mode=Mode.SUBTRACT)


with BuildPart() as f1_13:
    add(f1_12.part)

    # F5_t3: cut F5_tool4
    add(f5_tool4.part, mode=Mode.SUBTRACT)


with BuildPart() as f5_tool10:
    # F5_s11 → F5_t12 (new body)
    with BuildSketch(Plane.XZ.offset(16.5471408962)):
        with Locations((6.096, -10.4513148855)):
            Rectangle(F5_S11_W, F5_S11_H)
    extrude(amount=F5_T12_DEPTH)

    # F5_s13 → F5_t14 (revolve, cut)
    with BuildSketch(Plane(origin=(5.842, -16.5471408962, -10.1973148855), x_dir=(-0.7071067812, 0, 0.7071067812), z_dir=(0.7071067812, 0, 0.7071067812))):
        with BuildLine():
            ThreePointArc((0, -0.508), (0.508, 0), (0, 0.508))
            Line((0, 0.508), (0, -0.508))
        make_face()
    revolve(axis=Axis((5.842, -16.5471408962, -10.1973148855), (0, -1, 0)), mode=Mode.SUBTRACT)


with BuildPart() as f1_14:
    add(f1_13.part)

    # F5_t9: cut F5_tool10
    add(f5_tool10.part, mode=Mode.SUBTRACT)

    # F6: fillet of radius 0.508 on 1 edges, made by hand

    # F6_s2 → F6_t1 (cut)
    with BuildSketch(Plane.YZ.offset(-5.842)):
        with BuildLine():
            ThreePointArc((-23.4051408962, 18.3329497761), (-23.256351141, 17.9737395313), (-22.8971408962, 17.8249497761))
            Line((-22.8971408962, 17.8249497761), (-23.4051408962, 17.8249497761))
            Line((-23.4051408962, 17.8249497761), (-23.4051408962, 18.3329497761))
        make_face()
    extrude(amount=F6_T1_DEPTH, mode=Mode.SUBTRACT)


with BuildPart() as f6_tool4:
    # F6_s5 → F6_t6 (new body)
    with BuildSketch(Plane.XZ.offset(22.8971408962)):
        with Locations((-6.096, 18.0789497761)):
            Rectangle(F6_S5_W, F6_S5_H)
    extrude(amount=F6_T6_DEPTH)

    # F6_s7 → F6_t8 (revolve, cut)
    with BuildSketch(Plane(origin=(-5.842, -22.8971408962, 18.3329497761), x_dir=(0.7071067812, 0, 0.7071067812), z_dir=(0.7071067812, 0, -0.7071067812))):
        with BuildLine():
            ThreePointArc((0, -0.508), (0.508, 0), (0, 0.508))
            Line((0, 0.508), (0, -0.508))
        make_face()
    revolve(axis=Axis((-5.842, -22.8971408962, 18.3329497761), (0, -1, 0)), mode=Mode.SUBTRACT)


with BuildPart() as f1_15:
    add(f1_14.part)

    # F6_t3: cut F6_tool4
    add(f6_tool4.part, mode=Mode.SUBTRACT)


with BuildPart() as f6_tool10:
    # F6_s11 → F6_t12 (new body)
    with BuildSketch(Plane.XZ.offset(22.8971408962)):
        with Locations((6.096, 18.0789497761)):
            Rectangle(F6_S11_W, F6_S11_H)
    extrude(amount=F6_T12_DEPTH)

    # F6_s13 → F6_t14 (revolve, cut)
    with BuildSketch(Plane(origin=(5.842, -22.8971408962, 18.3329497761), x_dir=(-0.7071067812, 0, 0.7071067812), z_dir=(0.7071067812, 0, 0.7071067812))):
        with BuildLine():
            ThreePointArc((0, -0.508), (0.508, 0), (0, 0.508))
            Line((0, 0.508), (0, -0.508))
        make_face()
    revolve(axis=Axis((5.842, -22.8971408962, 18.3329497761), (0, -1, 0)), mode=Mode.SUBTRACT)


with BuildPart() as f1_16:
    add(f1_15.part)

    # F6_t9: cut F6_tool10
    add(f6_tool10.part, mode=Mode.SUBTRACT)

    # F8
    with Locations(Plane.XY.offset(24.1749497761)):
        with Locations((0, -15.1246003807)):
            Hole(F8_D / 2, depth=F8_DEPTH)
            with Locations((0, 0, -(F8_DEPTH + F8_TIP / 2))):  # 118° drill point
                Cone(0, F8_D / 2, F8_TIP, mode=Mode.SUBTRACT)

    # F10 (through all)
    with Locations(Plane.XY.offset(24.1749497761)):
        with Locations((3.7932256237, -20.6758901477)):
            Hole(F10_D / 2)


solid = f1_16.part
